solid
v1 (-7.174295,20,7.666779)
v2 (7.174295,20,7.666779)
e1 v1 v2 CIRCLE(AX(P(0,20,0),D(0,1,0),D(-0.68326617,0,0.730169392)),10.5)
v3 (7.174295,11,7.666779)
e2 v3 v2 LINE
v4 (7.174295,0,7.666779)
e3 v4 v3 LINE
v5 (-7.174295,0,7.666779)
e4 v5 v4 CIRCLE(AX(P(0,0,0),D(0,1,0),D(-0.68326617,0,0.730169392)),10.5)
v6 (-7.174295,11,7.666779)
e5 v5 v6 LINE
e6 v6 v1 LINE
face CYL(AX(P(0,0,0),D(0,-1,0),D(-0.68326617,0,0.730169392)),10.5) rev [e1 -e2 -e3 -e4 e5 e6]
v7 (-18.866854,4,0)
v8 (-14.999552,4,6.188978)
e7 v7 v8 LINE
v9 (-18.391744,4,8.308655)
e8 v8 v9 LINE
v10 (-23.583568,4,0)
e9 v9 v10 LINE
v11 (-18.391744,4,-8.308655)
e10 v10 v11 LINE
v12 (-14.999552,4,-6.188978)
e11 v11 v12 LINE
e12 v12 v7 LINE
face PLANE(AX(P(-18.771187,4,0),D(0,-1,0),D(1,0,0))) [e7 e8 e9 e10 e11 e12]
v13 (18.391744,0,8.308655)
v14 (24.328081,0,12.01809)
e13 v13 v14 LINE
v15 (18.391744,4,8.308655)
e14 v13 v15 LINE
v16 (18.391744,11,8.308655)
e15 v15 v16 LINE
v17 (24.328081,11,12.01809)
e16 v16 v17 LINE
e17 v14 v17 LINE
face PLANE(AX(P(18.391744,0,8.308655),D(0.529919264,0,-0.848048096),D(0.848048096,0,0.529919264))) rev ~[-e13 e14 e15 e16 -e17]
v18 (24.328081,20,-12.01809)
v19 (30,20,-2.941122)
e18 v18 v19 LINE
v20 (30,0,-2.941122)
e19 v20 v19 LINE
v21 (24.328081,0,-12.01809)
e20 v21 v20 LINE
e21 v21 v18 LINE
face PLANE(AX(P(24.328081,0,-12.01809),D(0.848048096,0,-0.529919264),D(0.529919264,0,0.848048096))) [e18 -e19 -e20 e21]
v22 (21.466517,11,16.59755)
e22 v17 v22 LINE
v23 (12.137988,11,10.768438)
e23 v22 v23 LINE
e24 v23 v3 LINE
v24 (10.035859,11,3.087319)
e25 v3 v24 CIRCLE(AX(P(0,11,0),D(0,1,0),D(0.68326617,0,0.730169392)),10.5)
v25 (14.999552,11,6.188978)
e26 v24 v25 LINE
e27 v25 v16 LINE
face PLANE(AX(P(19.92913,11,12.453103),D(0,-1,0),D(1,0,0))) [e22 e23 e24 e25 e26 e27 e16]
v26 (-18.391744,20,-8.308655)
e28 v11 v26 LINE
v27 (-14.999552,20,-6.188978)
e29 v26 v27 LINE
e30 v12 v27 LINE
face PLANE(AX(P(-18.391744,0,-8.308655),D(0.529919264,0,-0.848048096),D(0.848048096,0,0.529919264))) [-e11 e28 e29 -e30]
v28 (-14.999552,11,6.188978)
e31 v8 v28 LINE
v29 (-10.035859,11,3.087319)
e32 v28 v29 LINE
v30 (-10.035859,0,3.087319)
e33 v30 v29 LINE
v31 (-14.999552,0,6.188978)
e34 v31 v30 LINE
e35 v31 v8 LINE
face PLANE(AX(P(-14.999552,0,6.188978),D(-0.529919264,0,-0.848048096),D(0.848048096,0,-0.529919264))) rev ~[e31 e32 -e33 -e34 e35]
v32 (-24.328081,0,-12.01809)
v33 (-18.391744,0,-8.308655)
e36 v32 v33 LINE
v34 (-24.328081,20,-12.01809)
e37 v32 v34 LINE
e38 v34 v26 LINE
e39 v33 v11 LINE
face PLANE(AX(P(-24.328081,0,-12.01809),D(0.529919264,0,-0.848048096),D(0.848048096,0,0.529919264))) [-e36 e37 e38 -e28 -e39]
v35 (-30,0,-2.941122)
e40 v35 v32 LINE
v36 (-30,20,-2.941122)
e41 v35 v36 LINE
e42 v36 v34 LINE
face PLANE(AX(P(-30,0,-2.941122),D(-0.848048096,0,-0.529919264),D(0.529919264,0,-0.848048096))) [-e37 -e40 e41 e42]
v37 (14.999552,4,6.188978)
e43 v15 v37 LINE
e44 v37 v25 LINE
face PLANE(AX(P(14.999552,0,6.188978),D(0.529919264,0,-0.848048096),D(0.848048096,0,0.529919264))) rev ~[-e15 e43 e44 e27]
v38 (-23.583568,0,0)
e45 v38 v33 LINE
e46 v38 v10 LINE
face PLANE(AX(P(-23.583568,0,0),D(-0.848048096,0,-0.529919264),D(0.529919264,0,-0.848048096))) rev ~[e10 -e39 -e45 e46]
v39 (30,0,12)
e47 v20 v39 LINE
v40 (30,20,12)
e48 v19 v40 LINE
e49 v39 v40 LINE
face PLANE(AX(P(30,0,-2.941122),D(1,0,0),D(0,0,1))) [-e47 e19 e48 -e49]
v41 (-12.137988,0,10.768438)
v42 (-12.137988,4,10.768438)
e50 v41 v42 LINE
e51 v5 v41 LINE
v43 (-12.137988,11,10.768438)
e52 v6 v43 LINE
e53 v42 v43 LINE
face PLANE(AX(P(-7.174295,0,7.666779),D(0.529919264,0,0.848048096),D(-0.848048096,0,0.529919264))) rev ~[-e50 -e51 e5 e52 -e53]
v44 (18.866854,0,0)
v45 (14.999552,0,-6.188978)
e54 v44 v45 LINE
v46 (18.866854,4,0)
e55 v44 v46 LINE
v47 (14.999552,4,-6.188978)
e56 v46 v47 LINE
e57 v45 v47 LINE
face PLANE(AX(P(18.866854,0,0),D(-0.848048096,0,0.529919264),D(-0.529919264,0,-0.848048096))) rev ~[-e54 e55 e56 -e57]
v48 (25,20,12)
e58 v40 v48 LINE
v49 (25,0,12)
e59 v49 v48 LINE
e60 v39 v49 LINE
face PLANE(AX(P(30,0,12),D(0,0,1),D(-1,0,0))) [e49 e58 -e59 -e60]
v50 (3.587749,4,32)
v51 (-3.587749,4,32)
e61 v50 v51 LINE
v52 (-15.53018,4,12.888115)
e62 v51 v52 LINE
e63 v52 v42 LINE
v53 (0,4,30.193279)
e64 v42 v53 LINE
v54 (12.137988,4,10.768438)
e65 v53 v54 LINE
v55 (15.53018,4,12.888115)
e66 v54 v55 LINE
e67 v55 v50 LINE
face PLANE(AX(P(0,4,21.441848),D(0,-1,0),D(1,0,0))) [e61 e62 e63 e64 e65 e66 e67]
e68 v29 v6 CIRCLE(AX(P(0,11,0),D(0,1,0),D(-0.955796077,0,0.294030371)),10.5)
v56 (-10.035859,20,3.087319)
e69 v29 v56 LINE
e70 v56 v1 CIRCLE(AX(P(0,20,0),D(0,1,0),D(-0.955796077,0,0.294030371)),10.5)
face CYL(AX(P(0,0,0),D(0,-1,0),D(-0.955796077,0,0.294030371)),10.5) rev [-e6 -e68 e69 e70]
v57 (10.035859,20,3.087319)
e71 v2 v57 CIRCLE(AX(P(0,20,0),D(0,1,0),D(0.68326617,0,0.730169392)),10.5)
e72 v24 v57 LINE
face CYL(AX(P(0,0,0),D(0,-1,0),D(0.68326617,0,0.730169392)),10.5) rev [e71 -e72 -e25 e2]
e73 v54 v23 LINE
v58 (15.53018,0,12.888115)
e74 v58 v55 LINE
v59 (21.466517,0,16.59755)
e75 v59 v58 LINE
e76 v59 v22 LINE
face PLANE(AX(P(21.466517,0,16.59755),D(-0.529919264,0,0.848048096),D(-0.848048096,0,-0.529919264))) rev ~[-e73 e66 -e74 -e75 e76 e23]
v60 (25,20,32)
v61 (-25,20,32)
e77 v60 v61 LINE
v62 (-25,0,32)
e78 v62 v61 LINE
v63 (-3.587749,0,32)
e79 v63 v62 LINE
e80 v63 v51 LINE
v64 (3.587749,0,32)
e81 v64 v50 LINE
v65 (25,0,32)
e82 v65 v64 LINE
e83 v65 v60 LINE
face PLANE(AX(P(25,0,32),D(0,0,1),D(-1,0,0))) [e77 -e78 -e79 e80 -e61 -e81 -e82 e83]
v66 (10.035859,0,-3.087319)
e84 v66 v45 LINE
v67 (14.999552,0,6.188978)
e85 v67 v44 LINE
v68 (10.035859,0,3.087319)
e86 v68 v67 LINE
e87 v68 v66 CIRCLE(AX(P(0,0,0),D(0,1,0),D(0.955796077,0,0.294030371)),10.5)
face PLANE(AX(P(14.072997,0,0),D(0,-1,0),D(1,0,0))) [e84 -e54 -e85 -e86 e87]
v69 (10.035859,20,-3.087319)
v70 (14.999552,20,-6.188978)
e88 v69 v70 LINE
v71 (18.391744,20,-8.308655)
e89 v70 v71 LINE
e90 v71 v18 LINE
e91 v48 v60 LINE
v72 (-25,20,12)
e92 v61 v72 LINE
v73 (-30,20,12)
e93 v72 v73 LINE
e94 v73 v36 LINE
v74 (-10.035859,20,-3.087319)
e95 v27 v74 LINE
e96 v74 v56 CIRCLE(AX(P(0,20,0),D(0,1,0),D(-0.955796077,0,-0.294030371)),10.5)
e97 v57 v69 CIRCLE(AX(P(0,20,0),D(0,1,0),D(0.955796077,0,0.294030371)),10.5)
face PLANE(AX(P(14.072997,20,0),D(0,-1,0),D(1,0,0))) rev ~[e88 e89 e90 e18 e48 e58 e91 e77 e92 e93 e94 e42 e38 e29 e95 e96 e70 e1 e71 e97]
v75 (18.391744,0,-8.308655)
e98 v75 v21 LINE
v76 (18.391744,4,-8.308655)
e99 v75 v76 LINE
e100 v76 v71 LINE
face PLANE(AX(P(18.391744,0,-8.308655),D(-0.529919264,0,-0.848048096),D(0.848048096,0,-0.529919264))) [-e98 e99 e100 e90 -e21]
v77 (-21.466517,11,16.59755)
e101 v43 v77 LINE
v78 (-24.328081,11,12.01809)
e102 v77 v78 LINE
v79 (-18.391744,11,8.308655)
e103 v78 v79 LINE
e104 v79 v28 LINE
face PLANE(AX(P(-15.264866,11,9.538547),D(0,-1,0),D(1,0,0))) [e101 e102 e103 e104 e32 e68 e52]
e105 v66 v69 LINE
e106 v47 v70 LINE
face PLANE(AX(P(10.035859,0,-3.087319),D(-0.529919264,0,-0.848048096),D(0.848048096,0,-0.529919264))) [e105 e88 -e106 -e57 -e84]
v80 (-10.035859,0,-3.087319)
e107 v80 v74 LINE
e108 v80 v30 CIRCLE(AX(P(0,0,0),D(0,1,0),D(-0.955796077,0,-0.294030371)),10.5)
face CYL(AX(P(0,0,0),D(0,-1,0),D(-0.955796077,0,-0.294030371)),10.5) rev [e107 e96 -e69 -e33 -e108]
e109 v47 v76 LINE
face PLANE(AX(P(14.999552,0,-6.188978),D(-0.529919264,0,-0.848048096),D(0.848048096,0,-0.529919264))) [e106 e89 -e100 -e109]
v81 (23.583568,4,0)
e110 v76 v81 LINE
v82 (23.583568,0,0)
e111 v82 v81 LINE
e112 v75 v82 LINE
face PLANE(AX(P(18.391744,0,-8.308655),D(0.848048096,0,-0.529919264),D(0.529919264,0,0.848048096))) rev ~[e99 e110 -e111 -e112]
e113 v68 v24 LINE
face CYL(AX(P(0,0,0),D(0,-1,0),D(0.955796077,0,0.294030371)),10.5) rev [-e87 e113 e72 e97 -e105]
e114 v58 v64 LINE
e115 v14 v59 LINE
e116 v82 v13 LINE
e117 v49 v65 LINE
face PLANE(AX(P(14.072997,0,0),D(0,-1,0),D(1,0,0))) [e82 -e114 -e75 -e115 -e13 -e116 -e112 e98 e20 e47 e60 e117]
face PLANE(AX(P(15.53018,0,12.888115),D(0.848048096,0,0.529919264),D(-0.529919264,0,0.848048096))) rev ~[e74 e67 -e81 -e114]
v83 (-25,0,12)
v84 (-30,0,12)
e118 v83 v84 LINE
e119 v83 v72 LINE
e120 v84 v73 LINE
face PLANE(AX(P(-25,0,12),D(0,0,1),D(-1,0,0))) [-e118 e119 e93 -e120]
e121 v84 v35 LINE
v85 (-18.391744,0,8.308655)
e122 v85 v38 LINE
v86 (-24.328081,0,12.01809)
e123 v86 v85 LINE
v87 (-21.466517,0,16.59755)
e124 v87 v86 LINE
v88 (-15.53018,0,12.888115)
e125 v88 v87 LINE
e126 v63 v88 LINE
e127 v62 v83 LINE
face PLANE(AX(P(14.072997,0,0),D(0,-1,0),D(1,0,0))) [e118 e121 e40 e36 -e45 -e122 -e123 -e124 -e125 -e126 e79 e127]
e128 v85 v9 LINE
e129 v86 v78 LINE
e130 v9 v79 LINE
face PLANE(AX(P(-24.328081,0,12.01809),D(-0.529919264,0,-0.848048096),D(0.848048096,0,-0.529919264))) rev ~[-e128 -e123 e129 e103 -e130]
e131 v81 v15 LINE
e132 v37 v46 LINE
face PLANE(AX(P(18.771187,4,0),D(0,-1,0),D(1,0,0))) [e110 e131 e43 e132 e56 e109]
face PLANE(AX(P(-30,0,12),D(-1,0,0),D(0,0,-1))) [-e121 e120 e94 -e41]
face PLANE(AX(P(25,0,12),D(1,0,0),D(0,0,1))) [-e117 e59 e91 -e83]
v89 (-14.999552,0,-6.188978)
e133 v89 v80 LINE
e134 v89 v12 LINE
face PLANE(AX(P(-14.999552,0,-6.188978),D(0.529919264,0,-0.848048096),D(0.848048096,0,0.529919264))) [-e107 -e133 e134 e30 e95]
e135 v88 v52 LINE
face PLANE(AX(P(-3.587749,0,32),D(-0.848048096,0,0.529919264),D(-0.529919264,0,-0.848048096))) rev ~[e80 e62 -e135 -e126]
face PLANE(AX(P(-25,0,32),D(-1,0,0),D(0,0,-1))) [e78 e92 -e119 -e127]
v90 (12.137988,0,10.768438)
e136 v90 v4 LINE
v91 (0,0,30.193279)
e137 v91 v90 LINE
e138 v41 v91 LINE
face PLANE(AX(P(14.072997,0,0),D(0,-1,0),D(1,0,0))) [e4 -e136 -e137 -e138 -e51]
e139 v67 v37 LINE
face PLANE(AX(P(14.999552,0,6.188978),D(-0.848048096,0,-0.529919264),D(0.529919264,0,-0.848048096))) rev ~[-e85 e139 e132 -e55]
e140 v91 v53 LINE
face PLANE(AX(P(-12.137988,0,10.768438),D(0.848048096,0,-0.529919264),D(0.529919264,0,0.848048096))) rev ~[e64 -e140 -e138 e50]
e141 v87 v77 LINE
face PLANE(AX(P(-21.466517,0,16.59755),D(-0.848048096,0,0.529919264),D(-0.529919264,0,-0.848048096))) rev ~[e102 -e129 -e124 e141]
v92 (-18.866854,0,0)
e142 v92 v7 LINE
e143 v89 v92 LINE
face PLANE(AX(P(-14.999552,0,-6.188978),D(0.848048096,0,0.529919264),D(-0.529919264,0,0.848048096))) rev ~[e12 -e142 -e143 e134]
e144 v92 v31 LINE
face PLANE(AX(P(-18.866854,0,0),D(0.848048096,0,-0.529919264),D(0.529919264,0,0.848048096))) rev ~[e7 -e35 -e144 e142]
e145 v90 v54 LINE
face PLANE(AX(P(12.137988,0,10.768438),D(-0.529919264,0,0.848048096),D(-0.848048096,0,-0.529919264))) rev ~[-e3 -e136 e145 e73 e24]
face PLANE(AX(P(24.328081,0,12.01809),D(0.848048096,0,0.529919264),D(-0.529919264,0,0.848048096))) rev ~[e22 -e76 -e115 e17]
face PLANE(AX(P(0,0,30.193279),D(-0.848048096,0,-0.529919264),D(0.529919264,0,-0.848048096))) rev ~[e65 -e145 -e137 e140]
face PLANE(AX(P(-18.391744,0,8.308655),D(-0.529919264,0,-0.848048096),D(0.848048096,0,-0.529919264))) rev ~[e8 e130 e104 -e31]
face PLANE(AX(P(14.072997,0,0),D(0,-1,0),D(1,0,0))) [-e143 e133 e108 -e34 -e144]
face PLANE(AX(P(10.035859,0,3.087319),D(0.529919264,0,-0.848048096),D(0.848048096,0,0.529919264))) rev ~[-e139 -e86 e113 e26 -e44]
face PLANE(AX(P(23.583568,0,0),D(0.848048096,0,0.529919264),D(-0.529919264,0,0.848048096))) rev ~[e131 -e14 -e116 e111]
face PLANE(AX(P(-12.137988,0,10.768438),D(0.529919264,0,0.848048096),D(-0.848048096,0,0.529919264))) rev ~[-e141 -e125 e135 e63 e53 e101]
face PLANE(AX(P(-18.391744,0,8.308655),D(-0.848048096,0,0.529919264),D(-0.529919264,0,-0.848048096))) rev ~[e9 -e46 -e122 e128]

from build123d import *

# Parameters (mm, degrees)
F1_DEPTH = 20
F2_DEPTH = 11
F3_DEPTH = 4


with BuildPart() as f1:
    # F0 (on Front) → F1 (new body)
    with BuildSketch(Plane.XZ):
        with BuildLine():
            ThreePointArc((10.0358588078, 3.0873189), (10.5, 0), (10.0358588078, -3.0873189))
            Line((10.0358588078, -3.0873189), (14.9995515519, -6.1889783681))
            Line((14.9995515519, -6.1889783681), (18.8668544538, 0))
            Line((18.8668544538, 0), (14.9995515519, 6.1889783681))
            Line((14.9995515519, 6.1889783681), (10.0358588078, 3.0873189))
        make_face()
        with BuildLine():
            ThreePointArc((7.1742947809, 7.6667786192), (8.9045050096, 5.5641522744), (10.0358588078, 3.0873189))
            Line((10.0358588078, 3.0873189), (14.9995515519, 6.1889783681))
            Line((14.9995515519, 6.1889783681), (12.1379875251, 10.7684380874))
            Line((12.1379875251, 10.7684380874), (7.1742947809, 7.6667786192))
        make_face()
        Polygon((18.8668544538, 0), (14.9995515519, -6.1889783681), (18.3917439366, -8.308655425), (23.5835680672, 0), (18.3917439366, 8.308655425), (14.9995515519, 6.1889783681), align=None)
        with BuildLine():
            ThreePointArc((-7.1742947809, 7.6667786192), (0, 10.5), (7.1742947809, 7.6667786192))
            Line((7.1742947809, 7.6667786192), (12.1379875251, 10.7684380874))
            Line((12.1379875251, 10.7684380874), (0, 30.1932786368))
            Line((0, 30.1932786368), (-12.1379875251, 10.7684380874))
            Line((-12.1379875251, 10.7684380874), (-7.1742947809, 7.6667786192))
        make_face()
        Polygon((23.5835680672, 0), (18.3917439366, -8.308655425), (24.3280806097, -12.0180902747), (30, -2.9411218284), (30, 12), (25, 12), (25, 32), (3.5877488061, 32), (15.5301799097, 12.8881151443), (21.4665165828, 16.5975499939), (24.3280806097, 12.0180902747), (18.3917439366, 8.308655425), align=None)
        with BuildLine():
            ThreePointArc((-10.0358588078, 3.0873189), (-8.9045050096, 5.5641522744), (-7.1742947809, 7.6667786192))
            Line((-7.1742947809, 7.6667786192), (-12.1379875251, 10.7684380874))
            Line((-12.1379875251, 10.7684380874), (-14.9995515519, 6.1889783681))
            Line((-14.9995515519, 6.1889783681), (-10.0358588078, 3.0873189))
        make_face()
        Polygon((0, 30.1932786368), (12.1379875251, 10.7684380874), (15.5301799097, 12.8881151443), (3.5877488061, 32), (0, 32), (-3.5877488061, 32), (-15.5301799097, 12.8881151443), (-12.1379875251, 10.7684380874), align=None)
        with BuildLine():
            ThreePointArc((-10.0358588078, -3.0873189), (-10.5, 0), (-10.0358588078, 3.0873189))
            Line((-10.0358588078, 3.0873189), (-14.9995515519, 6.1889783681))
            Line((-14.9995515519, 6.1889783681), (-18.8668544538, 0))
            Line((-18.8668544538, 0), (-14.9995515519, -6.1889783681))
            Line((-14.9995515519, -6.1889783681), (-10.0358588078, -3.0873189))
        make_face()
        Polygon((-18.8668544538, 0), (-14.9995515519, 6.1889783681), (-18.3917439366, 8.308655425), (-23.5835680672, 0), (-18.3917439366, -8.308655425), (-14.9995515519, -6.1889783681), align=None)
        Polygon((-21.4665165828, 16.5975499939), (-15.5301799097, 12.8881151443), (-3.5877488061, 32), (-25, 32), (-25, 12), (-30, 12), (-30, -2.9411218284), (-24.3280806097, -12.0180902747), (-18.3917439366, -8.308655425), (-23.5835680672, 0), (-18.3917439366, 8.308655425), (-24.3280806097, 12.0180902747), align=None)
        Polygon((15.5301799097, 12.8881151443), (18.3917439366, 8.308655425), (24.3280806097, 12.0180902747), (21.4665165828, 16.5975499939), align=None)
        Polygon((12.1379875251, 10.7684380874), (14.9995515519, 6.1889783681), (18.3917439366, 8.308655425), (15.5301799097, 12.8881151443), align=None)
        Polygon((-14.9995515519, 6.1889783681), (-12.1379875251, 10.7684380874), (-15.5301799097, 12.8881151443), (-18.3917439366, 8.308655425), align=None)
        Polygon((-18.3917439366, 8.308655425), (-15.5301799097, 12.8881151443), (-21.4665165828, 16.5975499939), (-24.3280806097, 12.0180902747), align=None)
    extrude(amount=-F1_DEPTH)

    # F0 (on Front) → F2 (cut)
    with BuildSketch(Plane.XZ):
        Polygon((15.5301799097, 12.8881151443), (18.3917439366, 8.308655425), (24.3280806097, 12.0180902747), (21.4665165828, 16.5975499939), align=None)
        Polygon((12.1379875251, 10.7684380874), (14.9995515519, 6.1889783681), (18.3917439366, 8.308655425), (15.5301799097, 12.8881151443), align=None)
        with BuildLine():
            ThreePointArc((7.1742947809, 7.6667786192), (8.9045050096, 5.5641522744), (10.0358588078, 3.0873189))
            Line((10.0358588078, 3.0873189), (14.9995515519, 6.1889783681))
            Line((14.9995515519, 6.1889783681), (12.1379875251, 10.7684380874))
            Line((12.1379875251, 10.7684380874), (7.1742947809, 7.6667786192))
        make_face()
        Polygon((-14.9995515519, 6.1889783681), (-12.1379875251, 10.7684380874), (-15.5301799097, 12.8881151443), (-18.3917439366, 8.308655425), align=None)
        with BuildLine():
            ThreePointArc((-10.0358588078, 3.0873189), (-8.9045050096, 5.5641522744), (-7.1742947809, 7.6667786192))
            Line((-7.1742947809, 7.6667786192), (-12.1379875251, 10.7684380874))
            Line((-12.1379875251, 10.7684380874), (-14.9995515519, 6.1889783681))
            Line((-14.9995515519, 6.1889783681), (-10.0358588078, 3.0873189))
        make_face()
        Polygon((-18.3917439366, 8.308655425), (-15.5301799097, 12.8881151443), (-21.4665165828, 16.5975499939), (-24.3280806097, 12.0180902747), align=None)
    extrude(amount=-F2_DEPTH, mode=Mode.SUBTRACT)

    # F0 (on Front) → F3 (cut)
    with BuildSketch(Plane.XZ):
        Polygon((-18.8668544538, 0), (-14.9995515519, 6.1889783681), (-18.3917439366, 8.308655425), (-23.5835680672, 0), (-18.3917439366, -8.308655425), (-14.9995515519, -6.1889783681), align=None)
        Polygon((0, 30.1932786368), (12.1379875251, 10.7684380874), (15.5301799097, 12.8881151443), (3.5877488061, 32), (0, 32), (-3.5877488061, 32), (-15.5301799097, 12.8881151443), (-12.1379875251, 10.7684380874), align=None)
        Polygon((18.8668544538, 0), (14.9995515519, -6.1889783681), (18.3917439366, -8.308655425), (23.5835680672, 0), (18.3917439366, 8.308655425), (14.9995515519, 6.1889783681), align=None)
    extrude(amount=-F3_DEPTH, mode=Mode.SUBTRACT)


solid = f1.part
